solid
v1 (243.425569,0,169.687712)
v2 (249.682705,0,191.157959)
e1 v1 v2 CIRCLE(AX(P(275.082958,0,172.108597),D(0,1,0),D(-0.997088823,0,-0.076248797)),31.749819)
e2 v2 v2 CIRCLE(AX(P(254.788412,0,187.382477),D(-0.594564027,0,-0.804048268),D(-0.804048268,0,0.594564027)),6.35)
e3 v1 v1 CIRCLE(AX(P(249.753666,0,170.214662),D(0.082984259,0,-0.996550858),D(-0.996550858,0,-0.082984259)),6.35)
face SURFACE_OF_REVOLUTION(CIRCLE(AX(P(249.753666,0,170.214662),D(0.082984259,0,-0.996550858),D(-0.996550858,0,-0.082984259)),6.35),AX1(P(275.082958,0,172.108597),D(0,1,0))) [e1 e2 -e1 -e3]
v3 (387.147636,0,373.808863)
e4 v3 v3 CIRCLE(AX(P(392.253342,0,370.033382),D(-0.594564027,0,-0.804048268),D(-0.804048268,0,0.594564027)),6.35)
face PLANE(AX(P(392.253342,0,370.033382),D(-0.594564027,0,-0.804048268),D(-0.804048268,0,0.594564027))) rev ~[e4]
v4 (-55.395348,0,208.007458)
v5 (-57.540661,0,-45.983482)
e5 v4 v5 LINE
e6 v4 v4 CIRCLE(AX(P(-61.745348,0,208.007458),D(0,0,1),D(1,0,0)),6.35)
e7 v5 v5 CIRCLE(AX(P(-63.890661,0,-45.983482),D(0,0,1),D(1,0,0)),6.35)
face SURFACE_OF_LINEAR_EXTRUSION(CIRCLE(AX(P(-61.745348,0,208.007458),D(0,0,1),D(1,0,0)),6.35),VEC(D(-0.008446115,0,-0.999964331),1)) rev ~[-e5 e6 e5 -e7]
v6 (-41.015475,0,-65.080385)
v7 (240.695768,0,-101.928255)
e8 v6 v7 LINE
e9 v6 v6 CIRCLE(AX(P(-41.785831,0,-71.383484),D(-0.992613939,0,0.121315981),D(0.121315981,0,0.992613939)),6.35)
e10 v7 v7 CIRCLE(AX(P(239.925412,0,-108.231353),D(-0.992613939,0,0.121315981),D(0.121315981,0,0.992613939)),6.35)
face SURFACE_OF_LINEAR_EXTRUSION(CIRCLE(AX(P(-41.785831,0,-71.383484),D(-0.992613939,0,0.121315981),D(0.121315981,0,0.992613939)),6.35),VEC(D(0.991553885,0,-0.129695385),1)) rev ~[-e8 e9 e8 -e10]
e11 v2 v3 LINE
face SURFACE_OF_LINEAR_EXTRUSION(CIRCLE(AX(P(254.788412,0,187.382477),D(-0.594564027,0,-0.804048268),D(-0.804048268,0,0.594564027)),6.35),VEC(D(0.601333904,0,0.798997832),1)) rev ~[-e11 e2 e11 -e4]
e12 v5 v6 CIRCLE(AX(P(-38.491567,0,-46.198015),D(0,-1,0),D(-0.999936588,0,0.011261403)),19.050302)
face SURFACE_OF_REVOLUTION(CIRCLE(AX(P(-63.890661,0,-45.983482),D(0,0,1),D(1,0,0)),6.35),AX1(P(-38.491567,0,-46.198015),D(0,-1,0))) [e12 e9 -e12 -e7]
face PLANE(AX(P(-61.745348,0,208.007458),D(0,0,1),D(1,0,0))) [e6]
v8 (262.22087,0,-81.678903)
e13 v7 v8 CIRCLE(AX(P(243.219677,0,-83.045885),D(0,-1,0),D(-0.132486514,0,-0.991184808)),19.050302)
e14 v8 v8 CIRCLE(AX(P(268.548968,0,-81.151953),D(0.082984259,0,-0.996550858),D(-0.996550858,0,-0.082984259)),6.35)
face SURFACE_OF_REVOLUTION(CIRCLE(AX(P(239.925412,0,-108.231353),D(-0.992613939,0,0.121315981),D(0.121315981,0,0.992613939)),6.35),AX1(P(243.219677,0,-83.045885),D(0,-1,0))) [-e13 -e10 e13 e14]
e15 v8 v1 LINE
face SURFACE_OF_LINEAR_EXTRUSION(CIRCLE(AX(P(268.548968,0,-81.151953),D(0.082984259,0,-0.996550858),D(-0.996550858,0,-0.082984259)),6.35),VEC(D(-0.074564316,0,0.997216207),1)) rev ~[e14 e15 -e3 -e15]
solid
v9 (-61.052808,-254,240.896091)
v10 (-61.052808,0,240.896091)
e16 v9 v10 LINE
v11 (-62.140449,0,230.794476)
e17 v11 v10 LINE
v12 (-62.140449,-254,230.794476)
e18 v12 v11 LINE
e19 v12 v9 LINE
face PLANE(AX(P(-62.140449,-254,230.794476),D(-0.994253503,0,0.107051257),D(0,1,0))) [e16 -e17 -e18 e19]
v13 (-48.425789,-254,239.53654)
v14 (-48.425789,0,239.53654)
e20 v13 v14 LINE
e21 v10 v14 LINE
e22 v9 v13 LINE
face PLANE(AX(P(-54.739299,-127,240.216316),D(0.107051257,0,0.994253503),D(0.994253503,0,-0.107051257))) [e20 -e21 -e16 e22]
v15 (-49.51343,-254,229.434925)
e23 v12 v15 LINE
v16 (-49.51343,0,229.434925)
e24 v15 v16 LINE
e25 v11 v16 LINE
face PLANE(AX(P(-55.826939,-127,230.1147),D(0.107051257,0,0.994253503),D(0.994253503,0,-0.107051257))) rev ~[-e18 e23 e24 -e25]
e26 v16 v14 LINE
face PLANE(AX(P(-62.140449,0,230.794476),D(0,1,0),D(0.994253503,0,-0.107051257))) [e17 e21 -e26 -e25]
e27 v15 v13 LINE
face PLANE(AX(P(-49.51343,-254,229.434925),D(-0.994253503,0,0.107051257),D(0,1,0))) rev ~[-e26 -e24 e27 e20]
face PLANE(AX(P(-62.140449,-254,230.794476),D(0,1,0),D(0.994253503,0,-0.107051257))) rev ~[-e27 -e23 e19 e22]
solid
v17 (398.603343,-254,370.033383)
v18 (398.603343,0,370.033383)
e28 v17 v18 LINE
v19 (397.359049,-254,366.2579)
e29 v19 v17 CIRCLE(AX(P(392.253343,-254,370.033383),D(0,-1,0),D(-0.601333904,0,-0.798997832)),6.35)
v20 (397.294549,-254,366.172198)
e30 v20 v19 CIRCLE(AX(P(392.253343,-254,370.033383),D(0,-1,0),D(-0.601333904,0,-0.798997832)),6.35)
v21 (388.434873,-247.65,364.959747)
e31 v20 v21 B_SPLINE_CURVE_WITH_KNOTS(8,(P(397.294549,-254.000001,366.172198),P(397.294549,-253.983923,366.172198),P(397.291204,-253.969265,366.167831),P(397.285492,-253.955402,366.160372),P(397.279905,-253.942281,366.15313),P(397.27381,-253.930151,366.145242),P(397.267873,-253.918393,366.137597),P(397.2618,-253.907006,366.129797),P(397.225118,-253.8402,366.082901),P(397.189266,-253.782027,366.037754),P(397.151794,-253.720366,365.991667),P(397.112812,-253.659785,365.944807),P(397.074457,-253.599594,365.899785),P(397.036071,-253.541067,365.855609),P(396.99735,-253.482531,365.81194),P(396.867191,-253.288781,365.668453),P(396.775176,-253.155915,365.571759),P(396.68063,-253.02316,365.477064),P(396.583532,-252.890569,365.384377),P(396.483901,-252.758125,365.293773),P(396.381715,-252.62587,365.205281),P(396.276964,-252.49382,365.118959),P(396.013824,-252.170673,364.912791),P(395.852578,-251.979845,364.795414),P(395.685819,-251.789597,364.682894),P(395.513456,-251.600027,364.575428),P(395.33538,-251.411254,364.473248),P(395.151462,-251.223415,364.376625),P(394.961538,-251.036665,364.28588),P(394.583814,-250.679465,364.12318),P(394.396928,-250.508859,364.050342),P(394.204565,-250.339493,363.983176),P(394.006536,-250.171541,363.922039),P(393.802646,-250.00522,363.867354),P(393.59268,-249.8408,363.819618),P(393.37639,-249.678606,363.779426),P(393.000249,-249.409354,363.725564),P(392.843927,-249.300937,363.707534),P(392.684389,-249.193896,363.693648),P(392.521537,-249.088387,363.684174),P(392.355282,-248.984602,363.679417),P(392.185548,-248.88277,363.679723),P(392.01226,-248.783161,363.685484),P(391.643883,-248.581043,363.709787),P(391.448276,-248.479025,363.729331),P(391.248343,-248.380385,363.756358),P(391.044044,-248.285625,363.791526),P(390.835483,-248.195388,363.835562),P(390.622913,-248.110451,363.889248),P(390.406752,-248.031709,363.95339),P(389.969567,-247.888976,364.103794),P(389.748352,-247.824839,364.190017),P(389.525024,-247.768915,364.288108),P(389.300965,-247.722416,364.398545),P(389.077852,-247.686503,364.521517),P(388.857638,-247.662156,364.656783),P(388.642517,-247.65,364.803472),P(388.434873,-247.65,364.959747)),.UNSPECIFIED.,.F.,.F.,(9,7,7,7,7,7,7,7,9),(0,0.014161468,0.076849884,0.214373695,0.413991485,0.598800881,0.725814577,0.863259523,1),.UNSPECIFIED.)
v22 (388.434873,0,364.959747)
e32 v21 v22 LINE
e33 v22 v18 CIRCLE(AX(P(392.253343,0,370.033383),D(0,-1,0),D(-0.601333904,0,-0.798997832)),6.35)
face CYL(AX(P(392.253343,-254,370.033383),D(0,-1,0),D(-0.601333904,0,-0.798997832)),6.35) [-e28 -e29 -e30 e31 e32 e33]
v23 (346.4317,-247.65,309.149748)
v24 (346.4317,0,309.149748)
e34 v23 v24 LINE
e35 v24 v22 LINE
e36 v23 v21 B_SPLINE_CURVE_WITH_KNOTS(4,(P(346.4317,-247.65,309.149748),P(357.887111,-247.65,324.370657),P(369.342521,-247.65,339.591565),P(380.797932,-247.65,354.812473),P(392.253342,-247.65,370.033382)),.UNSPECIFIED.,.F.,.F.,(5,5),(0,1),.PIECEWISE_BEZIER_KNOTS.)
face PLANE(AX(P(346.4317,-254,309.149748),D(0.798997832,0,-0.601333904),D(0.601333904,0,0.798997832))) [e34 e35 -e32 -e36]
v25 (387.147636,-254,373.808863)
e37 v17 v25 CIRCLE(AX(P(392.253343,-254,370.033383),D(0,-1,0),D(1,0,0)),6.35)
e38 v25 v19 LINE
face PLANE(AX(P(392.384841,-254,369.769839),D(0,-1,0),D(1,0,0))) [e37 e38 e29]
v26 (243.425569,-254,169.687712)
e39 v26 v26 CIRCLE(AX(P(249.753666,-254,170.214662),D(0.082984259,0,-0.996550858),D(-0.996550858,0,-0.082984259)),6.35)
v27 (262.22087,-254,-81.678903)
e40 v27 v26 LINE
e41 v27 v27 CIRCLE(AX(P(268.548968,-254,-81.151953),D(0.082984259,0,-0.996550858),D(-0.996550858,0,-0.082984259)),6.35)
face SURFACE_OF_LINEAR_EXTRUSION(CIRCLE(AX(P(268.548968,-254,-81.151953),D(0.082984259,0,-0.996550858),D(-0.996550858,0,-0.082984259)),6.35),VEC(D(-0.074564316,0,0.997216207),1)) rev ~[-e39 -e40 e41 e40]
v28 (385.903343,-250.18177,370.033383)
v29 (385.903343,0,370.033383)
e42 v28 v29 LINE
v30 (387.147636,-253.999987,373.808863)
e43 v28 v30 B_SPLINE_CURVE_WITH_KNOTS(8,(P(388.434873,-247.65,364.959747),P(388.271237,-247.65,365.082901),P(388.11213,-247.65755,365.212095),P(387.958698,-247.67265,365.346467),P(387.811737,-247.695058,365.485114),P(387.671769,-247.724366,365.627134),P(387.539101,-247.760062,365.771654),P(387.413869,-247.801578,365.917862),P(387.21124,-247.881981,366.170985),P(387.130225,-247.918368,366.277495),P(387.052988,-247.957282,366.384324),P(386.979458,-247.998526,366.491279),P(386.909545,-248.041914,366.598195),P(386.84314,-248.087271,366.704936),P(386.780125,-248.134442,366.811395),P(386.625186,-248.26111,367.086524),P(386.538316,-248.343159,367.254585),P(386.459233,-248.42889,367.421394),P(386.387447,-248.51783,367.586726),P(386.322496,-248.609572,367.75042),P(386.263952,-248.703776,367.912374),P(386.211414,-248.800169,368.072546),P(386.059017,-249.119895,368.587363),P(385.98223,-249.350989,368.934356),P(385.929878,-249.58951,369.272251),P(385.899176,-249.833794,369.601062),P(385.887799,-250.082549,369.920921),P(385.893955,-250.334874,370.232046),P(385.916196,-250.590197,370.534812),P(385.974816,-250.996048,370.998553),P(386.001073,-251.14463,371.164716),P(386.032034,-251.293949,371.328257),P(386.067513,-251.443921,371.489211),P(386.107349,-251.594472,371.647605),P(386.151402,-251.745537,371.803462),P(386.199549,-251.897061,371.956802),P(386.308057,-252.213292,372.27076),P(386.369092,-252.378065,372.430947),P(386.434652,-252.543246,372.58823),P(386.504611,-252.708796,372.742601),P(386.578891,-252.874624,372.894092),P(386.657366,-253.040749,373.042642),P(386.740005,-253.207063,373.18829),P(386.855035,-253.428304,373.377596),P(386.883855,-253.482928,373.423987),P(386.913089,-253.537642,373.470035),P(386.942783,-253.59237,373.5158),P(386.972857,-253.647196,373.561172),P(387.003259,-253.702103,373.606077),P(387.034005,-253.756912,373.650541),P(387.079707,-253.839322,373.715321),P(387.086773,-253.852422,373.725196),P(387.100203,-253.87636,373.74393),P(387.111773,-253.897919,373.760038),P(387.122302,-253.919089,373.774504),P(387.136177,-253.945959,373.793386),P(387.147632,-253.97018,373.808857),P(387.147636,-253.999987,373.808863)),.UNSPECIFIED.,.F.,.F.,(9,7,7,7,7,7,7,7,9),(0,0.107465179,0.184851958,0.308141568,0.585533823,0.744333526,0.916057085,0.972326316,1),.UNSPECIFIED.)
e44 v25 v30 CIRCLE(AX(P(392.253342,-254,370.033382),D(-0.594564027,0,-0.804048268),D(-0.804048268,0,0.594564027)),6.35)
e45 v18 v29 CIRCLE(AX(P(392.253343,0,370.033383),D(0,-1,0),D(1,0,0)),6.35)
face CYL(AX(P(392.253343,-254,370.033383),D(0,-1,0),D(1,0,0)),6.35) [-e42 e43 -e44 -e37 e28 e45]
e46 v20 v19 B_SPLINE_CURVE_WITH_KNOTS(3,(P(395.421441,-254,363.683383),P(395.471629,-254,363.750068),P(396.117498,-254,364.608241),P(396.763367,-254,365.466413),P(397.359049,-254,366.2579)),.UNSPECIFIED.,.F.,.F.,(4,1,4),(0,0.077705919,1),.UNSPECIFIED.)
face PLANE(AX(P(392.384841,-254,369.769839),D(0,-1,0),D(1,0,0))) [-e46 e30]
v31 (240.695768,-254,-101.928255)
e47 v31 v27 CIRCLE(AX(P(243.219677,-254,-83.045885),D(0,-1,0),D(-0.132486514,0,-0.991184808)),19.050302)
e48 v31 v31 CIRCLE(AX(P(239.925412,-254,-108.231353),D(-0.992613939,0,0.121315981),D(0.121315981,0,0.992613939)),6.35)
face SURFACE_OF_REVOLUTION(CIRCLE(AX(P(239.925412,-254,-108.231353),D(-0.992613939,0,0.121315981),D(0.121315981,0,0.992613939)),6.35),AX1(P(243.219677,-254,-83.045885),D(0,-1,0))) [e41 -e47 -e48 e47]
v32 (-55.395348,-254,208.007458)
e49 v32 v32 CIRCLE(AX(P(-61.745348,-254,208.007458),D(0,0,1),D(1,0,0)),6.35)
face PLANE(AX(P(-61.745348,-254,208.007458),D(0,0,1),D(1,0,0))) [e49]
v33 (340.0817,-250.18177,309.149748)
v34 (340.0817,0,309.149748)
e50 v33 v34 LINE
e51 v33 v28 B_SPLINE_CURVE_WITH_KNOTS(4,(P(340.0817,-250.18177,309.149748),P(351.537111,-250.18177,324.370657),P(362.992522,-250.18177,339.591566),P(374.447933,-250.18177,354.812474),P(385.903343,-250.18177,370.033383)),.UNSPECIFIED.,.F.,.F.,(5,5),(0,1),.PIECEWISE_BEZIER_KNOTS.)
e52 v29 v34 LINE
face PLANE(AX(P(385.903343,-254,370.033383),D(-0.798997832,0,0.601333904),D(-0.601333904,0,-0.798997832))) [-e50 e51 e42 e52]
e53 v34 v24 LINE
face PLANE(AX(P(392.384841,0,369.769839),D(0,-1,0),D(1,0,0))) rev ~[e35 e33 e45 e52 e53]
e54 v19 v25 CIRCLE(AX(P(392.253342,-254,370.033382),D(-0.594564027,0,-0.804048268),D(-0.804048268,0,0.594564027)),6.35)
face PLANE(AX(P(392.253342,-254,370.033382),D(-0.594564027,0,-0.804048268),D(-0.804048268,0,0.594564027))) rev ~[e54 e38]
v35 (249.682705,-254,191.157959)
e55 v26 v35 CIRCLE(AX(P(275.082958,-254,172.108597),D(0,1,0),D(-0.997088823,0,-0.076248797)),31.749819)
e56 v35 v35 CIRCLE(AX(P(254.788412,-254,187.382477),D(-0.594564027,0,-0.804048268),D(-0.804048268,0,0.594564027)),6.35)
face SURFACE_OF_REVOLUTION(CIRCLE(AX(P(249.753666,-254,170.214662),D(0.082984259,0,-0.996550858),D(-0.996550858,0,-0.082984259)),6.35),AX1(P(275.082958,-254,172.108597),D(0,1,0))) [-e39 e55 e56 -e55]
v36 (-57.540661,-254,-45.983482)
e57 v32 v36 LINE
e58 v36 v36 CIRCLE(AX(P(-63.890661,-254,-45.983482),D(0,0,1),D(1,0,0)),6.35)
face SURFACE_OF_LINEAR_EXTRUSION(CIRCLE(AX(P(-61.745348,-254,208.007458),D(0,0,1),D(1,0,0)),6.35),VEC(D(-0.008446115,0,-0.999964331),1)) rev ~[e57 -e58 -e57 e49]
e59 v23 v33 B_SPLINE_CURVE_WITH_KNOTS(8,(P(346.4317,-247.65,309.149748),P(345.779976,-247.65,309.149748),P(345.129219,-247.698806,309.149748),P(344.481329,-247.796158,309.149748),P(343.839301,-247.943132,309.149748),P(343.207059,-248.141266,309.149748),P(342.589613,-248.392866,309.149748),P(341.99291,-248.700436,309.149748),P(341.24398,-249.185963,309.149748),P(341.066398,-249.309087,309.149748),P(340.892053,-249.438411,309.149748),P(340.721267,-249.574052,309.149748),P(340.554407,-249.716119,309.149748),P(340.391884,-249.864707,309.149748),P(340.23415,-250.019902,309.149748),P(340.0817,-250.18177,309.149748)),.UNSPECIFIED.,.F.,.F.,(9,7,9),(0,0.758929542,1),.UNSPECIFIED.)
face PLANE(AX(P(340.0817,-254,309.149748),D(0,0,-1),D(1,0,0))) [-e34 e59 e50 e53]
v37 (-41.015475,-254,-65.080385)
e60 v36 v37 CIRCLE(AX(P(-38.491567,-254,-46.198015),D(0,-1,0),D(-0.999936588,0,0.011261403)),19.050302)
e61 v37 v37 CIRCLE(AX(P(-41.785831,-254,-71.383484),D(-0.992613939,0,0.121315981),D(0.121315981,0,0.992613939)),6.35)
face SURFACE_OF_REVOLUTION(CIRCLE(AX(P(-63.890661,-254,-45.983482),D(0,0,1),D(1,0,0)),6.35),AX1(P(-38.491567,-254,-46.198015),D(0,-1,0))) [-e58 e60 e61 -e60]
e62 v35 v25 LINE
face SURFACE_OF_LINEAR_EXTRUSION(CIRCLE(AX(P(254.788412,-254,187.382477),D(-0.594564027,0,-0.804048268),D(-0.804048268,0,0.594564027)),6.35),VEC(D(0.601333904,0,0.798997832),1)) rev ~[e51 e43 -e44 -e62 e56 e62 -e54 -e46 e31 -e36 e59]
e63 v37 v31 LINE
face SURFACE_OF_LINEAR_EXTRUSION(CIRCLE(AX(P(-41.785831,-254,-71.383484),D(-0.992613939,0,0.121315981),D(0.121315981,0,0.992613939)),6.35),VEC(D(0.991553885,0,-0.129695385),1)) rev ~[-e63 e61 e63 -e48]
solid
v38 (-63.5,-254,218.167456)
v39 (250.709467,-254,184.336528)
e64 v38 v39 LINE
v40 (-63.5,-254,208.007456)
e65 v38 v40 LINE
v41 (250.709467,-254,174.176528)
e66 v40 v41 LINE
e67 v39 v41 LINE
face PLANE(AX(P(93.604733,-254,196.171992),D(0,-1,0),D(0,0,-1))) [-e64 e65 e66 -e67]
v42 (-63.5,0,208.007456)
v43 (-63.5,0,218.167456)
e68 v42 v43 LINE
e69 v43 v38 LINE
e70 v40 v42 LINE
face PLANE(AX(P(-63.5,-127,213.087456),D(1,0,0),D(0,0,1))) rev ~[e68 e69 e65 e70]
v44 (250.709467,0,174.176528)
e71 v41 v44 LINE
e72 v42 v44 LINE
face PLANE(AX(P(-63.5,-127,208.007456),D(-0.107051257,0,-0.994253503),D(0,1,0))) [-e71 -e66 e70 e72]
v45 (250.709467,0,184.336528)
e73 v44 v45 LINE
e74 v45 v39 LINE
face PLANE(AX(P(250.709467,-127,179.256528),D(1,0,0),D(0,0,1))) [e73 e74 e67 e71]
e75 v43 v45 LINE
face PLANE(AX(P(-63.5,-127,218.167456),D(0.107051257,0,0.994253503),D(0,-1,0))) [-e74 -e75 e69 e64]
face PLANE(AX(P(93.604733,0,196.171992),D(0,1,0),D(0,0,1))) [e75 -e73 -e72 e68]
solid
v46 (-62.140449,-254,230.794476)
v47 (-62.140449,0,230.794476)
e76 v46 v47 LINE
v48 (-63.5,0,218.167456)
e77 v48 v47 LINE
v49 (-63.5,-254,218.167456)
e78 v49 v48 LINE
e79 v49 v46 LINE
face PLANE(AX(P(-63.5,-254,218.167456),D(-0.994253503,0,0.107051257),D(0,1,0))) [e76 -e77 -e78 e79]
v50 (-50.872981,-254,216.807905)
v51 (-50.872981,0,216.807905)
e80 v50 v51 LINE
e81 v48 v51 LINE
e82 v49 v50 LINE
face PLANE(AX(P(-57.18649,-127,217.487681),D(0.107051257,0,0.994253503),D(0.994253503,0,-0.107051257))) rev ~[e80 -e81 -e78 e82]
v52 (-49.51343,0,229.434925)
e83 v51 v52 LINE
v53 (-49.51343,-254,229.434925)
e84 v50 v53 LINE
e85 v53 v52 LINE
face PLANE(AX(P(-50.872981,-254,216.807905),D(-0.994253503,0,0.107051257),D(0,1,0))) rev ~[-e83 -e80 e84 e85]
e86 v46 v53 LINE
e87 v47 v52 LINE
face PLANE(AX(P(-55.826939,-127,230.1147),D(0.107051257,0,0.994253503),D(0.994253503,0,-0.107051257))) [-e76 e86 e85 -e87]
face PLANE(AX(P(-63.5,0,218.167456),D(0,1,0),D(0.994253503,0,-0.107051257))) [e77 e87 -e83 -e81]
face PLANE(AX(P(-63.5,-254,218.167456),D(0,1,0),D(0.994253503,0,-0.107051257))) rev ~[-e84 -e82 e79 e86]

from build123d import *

# Parameters (mm, degrees)
F4_R      = 6.35
F6_R      = 6.35
F8_DEPTH  = 254
F10_W     = 254
F10_H     = 10.16
F14_DEPTH = 254
F15_W     = 12.7
F15_H     = 254
F16_DEPTH = 12.7
F17_W     = 12.7
F17_H     = 254
F18_DEPTH = 10.16


with BuildPart() as f5:
    # F5: sweep along a path in F1
    with BuildLine(Plane.XZ) as f5_path:
        Line((-61.7453475377, 208.0074561836), (-63.8906607053, -45.9834838741))
        ThreePointArc((-63.8906607053, -45.9834838741), (-57.6518689096, -62.872631205), (-41.7858294707, -71.3834838741))
        Line((-41.7858294707, -71.3834838741), (239.9254137755, -108.2313532754))
        ThreePointArc((239.9254137755, -108.2313532754), (260.675596222, -101.4971953394), (268.5489681957, -81.1519509704))
        Line((268.5489681957, -81.1519509704), (249.7536663039, 170.2146638692))
        ThreePointArc((249.7536663039, 170.2146638692), (250.7094665663, 179.2565284944), (254.7884130124, 187.38247865))
        Line((254.7884130124, 187.38247865), (392.253343443, 370.0333831145))
    # F4 (on offset) → F5 (sweep)
    with BuildSketch(Plane.XY.offset(208.007458)):
        with Locations((-61.7453475377, 0)):
            Circle(F4_R)
    sweep(path=f5_path.line)


with BuildPart() as f7:
    # F7: sweep along a path in F2
    with BuildLine(Plane.XZ.offset(254)) as f7_path:
        Line((-61.7453475377, 208.0074561836), (-63.8906607053, -45.9834838741))
        ThreePointArc((-63.8906607053, -45.9834838741), (-57.6518689096, -62.872631205), (-41.7858294707, -71.3834838741))
        Line((-41.7858294707, -71.3834838741), (239.9254137755, -108.2313532754))
        ThreePointArc((239.9254137755, -108.2313532754), (260.675596222, -101.4971953394), (268.5489681957, -81.1519509704))
        Line((268.5489681957, -81.1519509704), (249.7536663039, 170.2146638692))
        ThreePointArc((249.7536663039, 170.2146638692), (250.7094665663, 179.2565284944), (254.7884130124, 187.38247865))
        Line((254.7884130124, 187.38247865), (392.253343443, 370.0333831145))
    # F6 (on offset) → F7 (sweep)
    with BuildSketch(Plane.XY.offset(208.007458)):
        with Locations((-61.7453475377, -254)):
            Circle(F6_R)
    sweep(path=f7_path.line)

    # F2 (on offset) → F8 (join)
    with BuildSketch(Plane.XZ.offset(254)):
        with BuildLine():
            ThreePointArc((388.4348731532, 364.9597468793), (395.0884107843, 364.3514034269), (398.603343443, 370.0333831145))
            ThreePointArc((398.603343443, 370.0333831145), (389.4182761016, 375.715362802), (388.4348731532, 364.9597468793))
        make_face()
    extrude(amount=-F8_DEPTH)

    # F13 (on face) → F14 (join)
    with BuildSketch(Plane.XZ.offset(254)):
        Polygon((392.253343443, 370.0333831145), (385.903343443, 370.0333831145), (340.0816999661, 309.149748293), (346.4316999661, 309.149748293), align=None)
    extrude(amount=-F14_DEPTH)


with BuildPart() as f12:
    # F12: sweep along a path in F11
    with BuildLine(Plane.XZ) as f12_path:
        Line((-63.5, 213.0874561836), (250.7094665663, 179.2565284944))
    # F10 (on offset) → F12 (sweep)
    with BuildSketch(Plane.YZ.offset(-63.5)):
        with Locations((-127, 213.0874561836)):
            Rectangle(F10_W, F10_H)
    sweep(path=f12_path.line)


with BuildPart() as f16:
    # F15 (on face) → F16 (new body)
    with BuildSketch(Plane(origin=(22.4931822163, 0, 208.9085717804), x_dir=(0.9942535031, 0, -0.107051257), z_dir=(0.107051257, 0, 0.9942535031))):
        with Locations((-80.1401978729, -127)):
            Rectangle(F15_W, F15_H)
    extrude(amount=F16_DEPTH)


with BuildPart() as f18:
    # F17 (on face) → F18 (new body)
    with BuildSketch(Plane(origin=(23.8527331806, 0, 221.5355912694), x_dir=(0.9942535031, 0, -0.107051257), z_dir=(0.107051257, 0, 0.9942535031))):
        with Locations((-80.1401978729, -127)):
            Rectangle(F17_W, F17_H)
    extrude(amount=F18_DEPTH)


solid = Compound([f5.part, f7.part, f12.part, f16.part, f18.part])
